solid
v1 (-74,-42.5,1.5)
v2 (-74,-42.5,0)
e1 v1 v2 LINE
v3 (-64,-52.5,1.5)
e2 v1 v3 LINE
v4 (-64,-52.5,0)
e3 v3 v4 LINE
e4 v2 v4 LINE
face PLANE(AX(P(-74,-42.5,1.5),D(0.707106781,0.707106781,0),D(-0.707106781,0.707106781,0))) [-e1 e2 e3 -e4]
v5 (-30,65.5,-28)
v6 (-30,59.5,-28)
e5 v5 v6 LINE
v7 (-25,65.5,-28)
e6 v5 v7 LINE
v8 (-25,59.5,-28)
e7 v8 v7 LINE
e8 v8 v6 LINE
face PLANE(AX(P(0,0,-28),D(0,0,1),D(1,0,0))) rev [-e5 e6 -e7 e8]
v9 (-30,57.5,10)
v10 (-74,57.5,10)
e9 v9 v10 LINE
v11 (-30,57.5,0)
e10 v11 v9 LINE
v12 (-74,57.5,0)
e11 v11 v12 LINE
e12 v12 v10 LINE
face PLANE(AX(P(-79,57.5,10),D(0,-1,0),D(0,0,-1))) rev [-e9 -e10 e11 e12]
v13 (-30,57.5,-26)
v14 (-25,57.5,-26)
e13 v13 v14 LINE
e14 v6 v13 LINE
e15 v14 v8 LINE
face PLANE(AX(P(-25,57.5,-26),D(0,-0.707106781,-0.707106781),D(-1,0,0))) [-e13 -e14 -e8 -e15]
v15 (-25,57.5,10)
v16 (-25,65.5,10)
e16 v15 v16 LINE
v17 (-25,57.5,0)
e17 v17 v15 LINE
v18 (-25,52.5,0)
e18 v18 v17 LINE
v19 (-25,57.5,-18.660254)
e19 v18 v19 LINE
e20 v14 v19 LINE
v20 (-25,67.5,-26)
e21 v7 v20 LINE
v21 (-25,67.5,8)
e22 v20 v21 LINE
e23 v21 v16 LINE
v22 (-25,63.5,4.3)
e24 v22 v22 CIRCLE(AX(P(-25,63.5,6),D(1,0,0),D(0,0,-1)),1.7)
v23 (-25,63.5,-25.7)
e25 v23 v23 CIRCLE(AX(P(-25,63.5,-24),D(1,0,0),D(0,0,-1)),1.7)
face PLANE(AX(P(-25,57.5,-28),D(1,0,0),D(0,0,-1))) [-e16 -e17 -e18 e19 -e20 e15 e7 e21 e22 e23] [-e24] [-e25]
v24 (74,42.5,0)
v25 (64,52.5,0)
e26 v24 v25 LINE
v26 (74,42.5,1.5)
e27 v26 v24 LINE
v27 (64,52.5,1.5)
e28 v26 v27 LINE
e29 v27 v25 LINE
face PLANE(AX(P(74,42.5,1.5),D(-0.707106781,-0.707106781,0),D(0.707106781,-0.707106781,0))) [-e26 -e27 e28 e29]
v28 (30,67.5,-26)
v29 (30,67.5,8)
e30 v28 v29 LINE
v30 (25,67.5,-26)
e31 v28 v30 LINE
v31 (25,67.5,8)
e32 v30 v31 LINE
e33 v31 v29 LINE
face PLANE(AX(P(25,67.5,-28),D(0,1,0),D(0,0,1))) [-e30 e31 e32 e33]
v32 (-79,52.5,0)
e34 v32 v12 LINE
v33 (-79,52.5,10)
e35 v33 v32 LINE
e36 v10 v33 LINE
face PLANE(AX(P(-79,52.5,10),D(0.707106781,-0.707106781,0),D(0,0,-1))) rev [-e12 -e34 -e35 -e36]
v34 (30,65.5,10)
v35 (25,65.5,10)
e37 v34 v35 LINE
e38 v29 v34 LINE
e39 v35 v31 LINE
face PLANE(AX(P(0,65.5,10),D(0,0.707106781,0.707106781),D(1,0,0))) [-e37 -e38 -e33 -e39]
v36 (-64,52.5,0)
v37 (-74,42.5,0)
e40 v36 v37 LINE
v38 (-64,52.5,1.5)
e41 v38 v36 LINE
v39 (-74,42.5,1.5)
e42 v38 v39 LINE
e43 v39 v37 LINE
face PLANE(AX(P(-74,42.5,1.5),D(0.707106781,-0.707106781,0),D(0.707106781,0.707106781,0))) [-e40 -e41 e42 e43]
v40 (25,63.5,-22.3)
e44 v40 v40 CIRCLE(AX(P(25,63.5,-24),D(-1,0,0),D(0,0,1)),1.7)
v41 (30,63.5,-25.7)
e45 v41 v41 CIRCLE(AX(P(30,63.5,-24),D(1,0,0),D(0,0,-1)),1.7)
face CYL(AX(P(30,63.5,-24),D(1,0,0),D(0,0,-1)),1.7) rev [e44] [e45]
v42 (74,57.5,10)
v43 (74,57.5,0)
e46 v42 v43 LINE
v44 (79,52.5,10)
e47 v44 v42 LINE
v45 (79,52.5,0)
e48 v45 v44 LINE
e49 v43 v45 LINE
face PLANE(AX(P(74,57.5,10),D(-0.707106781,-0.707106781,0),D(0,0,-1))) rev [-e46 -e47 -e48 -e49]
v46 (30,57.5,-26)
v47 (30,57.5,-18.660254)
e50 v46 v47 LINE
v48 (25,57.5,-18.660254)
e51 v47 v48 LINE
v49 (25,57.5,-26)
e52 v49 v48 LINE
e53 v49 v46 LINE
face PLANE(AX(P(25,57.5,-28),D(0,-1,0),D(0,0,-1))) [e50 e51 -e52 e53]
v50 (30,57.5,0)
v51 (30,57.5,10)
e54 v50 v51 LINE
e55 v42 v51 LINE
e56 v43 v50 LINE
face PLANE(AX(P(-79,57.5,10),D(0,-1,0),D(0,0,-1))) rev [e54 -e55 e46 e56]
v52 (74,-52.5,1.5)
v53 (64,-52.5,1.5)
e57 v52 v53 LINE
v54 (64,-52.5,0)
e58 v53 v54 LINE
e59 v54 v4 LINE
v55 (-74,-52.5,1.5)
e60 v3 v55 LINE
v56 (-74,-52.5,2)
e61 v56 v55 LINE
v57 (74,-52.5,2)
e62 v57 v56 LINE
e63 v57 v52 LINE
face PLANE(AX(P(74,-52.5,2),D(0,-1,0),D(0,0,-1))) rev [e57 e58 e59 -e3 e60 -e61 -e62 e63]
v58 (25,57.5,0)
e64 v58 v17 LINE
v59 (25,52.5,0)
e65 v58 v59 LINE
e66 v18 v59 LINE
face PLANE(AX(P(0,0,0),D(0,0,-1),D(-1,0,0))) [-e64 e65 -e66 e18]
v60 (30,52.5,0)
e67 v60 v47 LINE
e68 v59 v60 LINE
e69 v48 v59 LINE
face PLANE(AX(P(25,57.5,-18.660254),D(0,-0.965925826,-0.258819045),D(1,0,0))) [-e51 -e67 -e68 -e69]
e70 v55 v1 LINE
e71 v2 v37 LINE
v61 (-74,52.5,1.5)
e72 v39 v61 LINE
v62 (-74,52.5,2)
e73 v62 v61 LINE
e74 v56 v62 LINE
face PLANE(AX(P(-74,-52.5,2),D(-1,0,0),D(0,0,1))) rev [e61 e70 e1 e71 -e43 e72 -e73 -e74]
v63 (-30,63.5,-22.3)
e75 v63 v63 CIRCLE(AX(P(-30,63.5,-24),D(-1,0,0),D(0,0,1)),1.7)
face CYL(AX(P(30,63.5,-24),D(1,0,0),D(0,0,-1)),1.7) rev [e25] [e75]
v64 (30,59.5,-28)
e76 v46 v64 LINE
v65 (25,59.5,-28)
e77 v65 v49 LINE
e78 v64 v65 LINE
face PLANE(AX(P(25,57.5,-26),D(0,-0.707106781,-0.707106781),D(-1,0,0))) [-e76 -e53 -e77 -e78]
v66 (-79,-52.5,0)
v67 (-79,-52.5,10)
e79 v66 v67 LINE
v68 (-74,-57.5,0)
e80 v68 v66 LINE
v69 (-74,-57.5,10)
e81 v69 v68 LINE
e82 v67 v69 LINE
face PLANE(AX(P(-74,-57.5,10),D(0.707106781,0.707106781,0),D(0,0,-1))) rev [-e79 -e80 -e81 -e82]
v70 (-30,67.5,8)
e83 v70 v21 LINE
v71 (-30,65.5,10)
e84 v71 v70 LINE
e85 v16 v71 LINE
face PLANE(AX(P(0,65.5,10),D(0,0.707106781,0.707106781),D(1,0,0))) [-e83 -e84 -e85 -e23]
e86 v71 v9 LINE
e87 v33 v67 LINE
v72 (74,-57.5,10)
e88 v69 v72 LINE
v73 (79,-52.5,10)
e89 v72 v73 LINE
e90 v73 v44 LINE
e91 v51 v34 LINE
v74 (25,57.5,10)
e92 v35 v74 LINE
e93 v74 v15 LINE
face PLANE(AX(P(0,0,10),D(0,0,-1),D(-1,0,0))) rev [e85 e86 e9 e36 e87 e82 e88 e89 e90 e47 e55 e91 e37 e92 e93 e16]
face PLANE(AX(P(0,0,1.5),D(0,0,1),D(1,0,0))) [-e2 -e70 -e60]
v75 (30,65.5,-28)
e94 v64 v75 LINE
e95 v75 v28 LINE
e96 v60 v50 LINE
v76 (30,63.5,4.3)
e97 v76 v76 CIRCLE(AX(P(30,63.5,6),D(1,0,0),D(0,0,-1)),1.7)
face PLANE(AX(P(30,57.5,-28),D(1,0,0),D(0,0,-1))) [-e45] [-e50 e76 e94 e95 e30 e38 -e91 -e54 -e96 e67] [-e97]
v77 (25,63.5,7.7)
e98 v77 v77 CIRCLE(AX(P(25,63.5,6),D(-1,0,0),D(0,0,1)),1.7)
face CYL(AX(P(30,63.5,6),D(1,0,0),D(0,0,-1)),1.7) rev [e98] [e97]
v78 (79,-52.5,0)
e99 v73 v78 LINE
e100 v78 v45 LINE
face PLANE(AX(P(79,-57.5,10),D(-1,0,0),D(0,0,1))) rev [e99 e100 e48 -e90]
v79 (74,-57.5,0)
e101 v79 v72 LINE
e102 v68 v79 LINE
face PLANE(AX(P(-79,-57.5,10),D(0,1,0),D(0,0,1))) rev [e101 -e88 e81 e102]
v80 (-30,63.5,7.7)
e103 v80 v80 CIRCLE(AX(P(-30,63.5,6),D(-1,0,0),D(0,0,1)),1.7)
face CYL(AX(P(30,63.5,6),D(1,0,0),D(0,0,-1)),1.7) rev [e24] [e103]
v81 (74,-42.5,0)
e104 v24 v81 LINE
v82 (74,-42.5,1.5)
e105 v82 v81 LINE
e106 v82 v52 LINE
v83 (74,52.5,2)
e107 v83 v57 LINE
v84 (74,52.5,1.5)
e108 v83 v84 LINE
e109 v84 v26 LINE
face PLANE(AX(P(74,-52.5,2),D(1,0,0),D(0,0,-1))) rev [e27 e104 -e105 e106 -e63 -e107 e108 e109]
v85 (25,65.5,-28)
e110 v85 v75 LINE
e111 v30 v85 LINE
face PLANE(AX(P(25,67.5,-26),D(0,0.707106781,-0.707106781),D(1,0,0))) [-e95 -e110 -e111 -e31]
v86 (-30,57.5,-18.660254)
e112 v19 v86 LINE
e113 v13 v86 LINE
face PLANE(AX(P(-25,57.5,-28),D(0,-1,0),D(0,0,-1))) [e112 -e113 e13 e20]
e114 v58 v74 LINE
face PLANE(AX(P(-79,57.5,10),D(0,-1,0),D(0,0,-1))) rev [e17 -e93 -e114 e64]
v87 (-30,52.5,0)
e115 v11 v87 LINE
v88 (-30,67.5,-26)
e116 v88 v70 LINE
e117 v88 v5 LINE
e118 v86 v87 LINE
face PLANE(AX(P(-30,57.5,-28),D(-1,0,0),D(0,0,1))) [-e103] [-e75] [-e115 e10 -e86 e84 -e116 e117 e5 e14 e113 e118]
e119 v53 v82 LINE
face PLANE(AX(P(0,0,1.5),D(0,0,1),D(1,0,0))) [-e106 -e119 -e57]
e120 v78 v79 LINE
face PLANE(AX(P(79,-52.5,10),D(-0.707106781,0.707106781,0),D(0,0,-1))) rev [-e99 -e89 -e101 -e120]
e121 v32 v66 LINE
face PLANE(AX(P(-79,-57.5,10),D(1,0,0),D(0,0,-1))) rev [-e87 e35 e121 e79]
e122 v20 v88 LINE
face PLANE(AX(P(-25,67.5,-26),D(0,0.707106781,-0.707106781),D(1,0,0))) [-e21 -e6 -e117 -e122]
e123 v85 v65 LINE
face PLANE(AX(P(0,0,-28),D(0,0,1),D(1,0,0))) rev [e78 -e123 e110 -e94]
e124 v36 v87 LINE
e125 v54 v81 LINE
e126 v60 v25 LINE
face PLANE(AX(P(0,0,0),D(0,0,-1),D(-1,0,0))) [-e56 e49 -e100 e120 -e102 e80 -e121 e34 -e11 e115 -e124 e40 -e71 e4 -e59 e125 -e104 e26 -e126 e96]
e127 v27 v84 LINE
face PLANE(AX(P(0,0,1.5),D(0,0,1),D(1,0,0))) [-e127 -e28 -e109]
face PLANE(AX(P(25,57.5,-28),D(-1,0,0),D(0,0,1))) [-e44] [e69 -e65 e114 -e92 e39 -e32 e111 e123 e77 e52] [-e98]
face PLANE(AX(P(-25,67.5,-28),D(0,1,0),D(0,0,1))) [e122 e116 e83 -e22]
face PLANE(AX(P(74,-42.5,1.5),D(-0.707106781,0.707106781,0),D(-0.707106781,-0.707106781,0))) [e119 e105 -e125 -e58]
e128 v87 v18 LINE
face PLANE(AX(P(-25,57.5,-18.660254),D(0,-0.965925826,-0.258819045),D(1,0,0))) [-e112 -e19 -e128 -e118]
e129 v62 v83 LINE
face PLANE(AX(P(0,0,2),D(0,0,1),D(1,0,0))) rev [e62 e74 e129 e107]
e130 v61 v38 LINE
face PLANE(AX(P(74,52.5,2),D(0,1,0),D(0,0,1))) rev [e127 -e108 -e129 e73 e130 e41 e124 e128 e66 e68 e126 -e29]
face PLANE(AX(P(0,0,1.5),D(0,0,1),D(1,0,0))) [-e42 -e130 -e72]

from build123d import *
from OCP.BRepFilletAPI import BRepFilletAPI_MakeChamfer

# Parameters (mm, degrees)
SKETCH1_W            = 158
SKETCH1_H            = 115
BOSS_EXTRUDE1_DEPTH  = 10
SKETCH2_W            = 148
SKETCH2_H            = 105
CUT_EXTRUDE1_DEPTH   = 2
BOSS_EXTRUDE2_DEPTH  = 1.5
SKETCH4_W            = 5
SKETCH4_H            = 10
BOSS_EXTRUDE3_DEPTH  = 38
M3_CLEARANCE_HOLE1_D = 3.4
CHAMFER3_SIZE        = 2
CHAMFER4_SIZE        = 5
CHAMFER4_SIZE_2      = 18.660254038
CHAMFER5_SIZE        = 5
CHAMFER6_SIZE        = 2


with BuildPart() as part:
    # Sketch1 → Boss-Extrude1 (new body)
    with BuildSketch(Plane.XY):
        Rectangle(SKETCH1_W, SKETCH1_H)
    extrude(amount=BOSS_EXTRUDE1_DEPTH)

    # Sketch2 → Cut-Extrude1 (cut)
    with BuildSketch(Plane(origin=(0, 0, 0), x_dir=(-1, 0, 0), z_dir=(0, 0, -1))):
        Rectangle(SKETCH2_W, SKETCH2_H)
    extrude(amount=-CUT_EXTRUDE1_DEPTH, mode=Mode.SUBTRACT)

    # Sketch3 → Boss-Extrude2 (add)
    with BuildSketch(Plane(origin=(0, 0, 0), x_dir=(-1, 0, 0), z_dir=(0, 0, -1))):
        Polygon((-74, 42.5), (-64, 52.5), (-74, 52.5), align=None)
        Polygon((74, 52.5), (74, 42.5), (64, 52.5), align=None)
        Polygon((-74, -52.5), (-74, -42.5), (-64, -52.5), align=None)
        Polygon((74, -42.5), (64, -52.5), (74, -52.5), align=None)
    extrude(amount=-BOSS_EXTRUDE2_DEPTH)

    # Sketch4 → Boss-Extrude3 (add)
    with BuildSketch(Plane.XY.offset(10)):
        with Locations((27.5, 62.5)):
            Rectangle(SKETCH4_W, SKETCH4_H)
        with Locations((-27.5, 62.5)):
            Rectangle(SKETCH4_W, SKETCH4_H)
    extrude(amount=-BOSS_EXTRUDE3_DEPTH)

    # M3 Clearance Hole1 (through all)
    with Locations(Plane(origin=(30, 0, 0), x_dir=(0, 0, -1), z_dir=(1, 0, 0))):
        with Locations((24, 63.5), (-6, 63.5)):
            Hole(M3_CLEARANCE_HOLE1_D / 2)

    # Chamfer3
    chamfer3_edges = [part.edges().sort_by_distance(p)[0] for p in [
        (-27.5, 67.5, -28),
        (27.5, 67.5, -28),
        (27.5, 67.5, 10),
        (-27.5, 67.5, 10),
    ]]
    chamfer(chamfer3_edges, length=CHAMFER3_SIZE)

    # Chamfer4
    chamfer4_edges_1 = [part.edges().sort_by_distance(p)[0] for p in [
        (-27.5, 57.5, 0),
    ]]
    chamfer4_side_1 = [part.faces().sort_by_distance(p)[0] for p in [
        (-27.5, 57.4, 0),
    ]]
    chamfer4_edges_2 = [part.edges().sort_by_distance(p)[0] for p in [
        (27.5, 57.5, 0),
    ]]
    chamfer4_side_2 = [part.faces().sort_by_distance(p)[0] for p in [
        (27.5, 57.5, -0.1),
    ]]
    chamfer4 = BRepFilletAPI_MakeChamfer(part.part.solid().wrapped)
    for e in chamfer4_edges_1:
        chamfer4.Add(CHAMFER4_SIZE - 0.0001, CHAMFER4_SIZE_2 - 0.0001, e.wrapped, chamfer4_side_1[0].wrapped)
    for e in chamfer4_edges_2:
        chamfer4.Add(CHAMFER4_SIZE_2 - 0.0001, CHAMFER4_SIZE - 0.0001, e.wrapped, chamfer4_side_2[0].wrapped)
    add(Compound.cast(chamfer4.Shape()), mode=Mode.REPLACE)  # a hair under: the kernel refuses the full size

    # Chamfer5
    chamfer5_edges = [part.edges().sort_by_distance(p)[0] for p in [
        (79, 57.5, 5),
        (-79, 57.5, 5),
        (-79, -57.5, 5),
        (79, -57.5, 5),
    ]]
    chamfer(chamfer5_edges, length=CHAMFER5_SIZE)

    # Chamfer6
    chamfer6_edges = [part.edges().sort_by_distance(p)[0] for p in [
        (-27.5, 57.5, -28),
        (27.5, 57.5, -28),
    ]]
    chamfer(chamfer6_edges, length=CHAMFER6_SIZE)


solid = part.part
